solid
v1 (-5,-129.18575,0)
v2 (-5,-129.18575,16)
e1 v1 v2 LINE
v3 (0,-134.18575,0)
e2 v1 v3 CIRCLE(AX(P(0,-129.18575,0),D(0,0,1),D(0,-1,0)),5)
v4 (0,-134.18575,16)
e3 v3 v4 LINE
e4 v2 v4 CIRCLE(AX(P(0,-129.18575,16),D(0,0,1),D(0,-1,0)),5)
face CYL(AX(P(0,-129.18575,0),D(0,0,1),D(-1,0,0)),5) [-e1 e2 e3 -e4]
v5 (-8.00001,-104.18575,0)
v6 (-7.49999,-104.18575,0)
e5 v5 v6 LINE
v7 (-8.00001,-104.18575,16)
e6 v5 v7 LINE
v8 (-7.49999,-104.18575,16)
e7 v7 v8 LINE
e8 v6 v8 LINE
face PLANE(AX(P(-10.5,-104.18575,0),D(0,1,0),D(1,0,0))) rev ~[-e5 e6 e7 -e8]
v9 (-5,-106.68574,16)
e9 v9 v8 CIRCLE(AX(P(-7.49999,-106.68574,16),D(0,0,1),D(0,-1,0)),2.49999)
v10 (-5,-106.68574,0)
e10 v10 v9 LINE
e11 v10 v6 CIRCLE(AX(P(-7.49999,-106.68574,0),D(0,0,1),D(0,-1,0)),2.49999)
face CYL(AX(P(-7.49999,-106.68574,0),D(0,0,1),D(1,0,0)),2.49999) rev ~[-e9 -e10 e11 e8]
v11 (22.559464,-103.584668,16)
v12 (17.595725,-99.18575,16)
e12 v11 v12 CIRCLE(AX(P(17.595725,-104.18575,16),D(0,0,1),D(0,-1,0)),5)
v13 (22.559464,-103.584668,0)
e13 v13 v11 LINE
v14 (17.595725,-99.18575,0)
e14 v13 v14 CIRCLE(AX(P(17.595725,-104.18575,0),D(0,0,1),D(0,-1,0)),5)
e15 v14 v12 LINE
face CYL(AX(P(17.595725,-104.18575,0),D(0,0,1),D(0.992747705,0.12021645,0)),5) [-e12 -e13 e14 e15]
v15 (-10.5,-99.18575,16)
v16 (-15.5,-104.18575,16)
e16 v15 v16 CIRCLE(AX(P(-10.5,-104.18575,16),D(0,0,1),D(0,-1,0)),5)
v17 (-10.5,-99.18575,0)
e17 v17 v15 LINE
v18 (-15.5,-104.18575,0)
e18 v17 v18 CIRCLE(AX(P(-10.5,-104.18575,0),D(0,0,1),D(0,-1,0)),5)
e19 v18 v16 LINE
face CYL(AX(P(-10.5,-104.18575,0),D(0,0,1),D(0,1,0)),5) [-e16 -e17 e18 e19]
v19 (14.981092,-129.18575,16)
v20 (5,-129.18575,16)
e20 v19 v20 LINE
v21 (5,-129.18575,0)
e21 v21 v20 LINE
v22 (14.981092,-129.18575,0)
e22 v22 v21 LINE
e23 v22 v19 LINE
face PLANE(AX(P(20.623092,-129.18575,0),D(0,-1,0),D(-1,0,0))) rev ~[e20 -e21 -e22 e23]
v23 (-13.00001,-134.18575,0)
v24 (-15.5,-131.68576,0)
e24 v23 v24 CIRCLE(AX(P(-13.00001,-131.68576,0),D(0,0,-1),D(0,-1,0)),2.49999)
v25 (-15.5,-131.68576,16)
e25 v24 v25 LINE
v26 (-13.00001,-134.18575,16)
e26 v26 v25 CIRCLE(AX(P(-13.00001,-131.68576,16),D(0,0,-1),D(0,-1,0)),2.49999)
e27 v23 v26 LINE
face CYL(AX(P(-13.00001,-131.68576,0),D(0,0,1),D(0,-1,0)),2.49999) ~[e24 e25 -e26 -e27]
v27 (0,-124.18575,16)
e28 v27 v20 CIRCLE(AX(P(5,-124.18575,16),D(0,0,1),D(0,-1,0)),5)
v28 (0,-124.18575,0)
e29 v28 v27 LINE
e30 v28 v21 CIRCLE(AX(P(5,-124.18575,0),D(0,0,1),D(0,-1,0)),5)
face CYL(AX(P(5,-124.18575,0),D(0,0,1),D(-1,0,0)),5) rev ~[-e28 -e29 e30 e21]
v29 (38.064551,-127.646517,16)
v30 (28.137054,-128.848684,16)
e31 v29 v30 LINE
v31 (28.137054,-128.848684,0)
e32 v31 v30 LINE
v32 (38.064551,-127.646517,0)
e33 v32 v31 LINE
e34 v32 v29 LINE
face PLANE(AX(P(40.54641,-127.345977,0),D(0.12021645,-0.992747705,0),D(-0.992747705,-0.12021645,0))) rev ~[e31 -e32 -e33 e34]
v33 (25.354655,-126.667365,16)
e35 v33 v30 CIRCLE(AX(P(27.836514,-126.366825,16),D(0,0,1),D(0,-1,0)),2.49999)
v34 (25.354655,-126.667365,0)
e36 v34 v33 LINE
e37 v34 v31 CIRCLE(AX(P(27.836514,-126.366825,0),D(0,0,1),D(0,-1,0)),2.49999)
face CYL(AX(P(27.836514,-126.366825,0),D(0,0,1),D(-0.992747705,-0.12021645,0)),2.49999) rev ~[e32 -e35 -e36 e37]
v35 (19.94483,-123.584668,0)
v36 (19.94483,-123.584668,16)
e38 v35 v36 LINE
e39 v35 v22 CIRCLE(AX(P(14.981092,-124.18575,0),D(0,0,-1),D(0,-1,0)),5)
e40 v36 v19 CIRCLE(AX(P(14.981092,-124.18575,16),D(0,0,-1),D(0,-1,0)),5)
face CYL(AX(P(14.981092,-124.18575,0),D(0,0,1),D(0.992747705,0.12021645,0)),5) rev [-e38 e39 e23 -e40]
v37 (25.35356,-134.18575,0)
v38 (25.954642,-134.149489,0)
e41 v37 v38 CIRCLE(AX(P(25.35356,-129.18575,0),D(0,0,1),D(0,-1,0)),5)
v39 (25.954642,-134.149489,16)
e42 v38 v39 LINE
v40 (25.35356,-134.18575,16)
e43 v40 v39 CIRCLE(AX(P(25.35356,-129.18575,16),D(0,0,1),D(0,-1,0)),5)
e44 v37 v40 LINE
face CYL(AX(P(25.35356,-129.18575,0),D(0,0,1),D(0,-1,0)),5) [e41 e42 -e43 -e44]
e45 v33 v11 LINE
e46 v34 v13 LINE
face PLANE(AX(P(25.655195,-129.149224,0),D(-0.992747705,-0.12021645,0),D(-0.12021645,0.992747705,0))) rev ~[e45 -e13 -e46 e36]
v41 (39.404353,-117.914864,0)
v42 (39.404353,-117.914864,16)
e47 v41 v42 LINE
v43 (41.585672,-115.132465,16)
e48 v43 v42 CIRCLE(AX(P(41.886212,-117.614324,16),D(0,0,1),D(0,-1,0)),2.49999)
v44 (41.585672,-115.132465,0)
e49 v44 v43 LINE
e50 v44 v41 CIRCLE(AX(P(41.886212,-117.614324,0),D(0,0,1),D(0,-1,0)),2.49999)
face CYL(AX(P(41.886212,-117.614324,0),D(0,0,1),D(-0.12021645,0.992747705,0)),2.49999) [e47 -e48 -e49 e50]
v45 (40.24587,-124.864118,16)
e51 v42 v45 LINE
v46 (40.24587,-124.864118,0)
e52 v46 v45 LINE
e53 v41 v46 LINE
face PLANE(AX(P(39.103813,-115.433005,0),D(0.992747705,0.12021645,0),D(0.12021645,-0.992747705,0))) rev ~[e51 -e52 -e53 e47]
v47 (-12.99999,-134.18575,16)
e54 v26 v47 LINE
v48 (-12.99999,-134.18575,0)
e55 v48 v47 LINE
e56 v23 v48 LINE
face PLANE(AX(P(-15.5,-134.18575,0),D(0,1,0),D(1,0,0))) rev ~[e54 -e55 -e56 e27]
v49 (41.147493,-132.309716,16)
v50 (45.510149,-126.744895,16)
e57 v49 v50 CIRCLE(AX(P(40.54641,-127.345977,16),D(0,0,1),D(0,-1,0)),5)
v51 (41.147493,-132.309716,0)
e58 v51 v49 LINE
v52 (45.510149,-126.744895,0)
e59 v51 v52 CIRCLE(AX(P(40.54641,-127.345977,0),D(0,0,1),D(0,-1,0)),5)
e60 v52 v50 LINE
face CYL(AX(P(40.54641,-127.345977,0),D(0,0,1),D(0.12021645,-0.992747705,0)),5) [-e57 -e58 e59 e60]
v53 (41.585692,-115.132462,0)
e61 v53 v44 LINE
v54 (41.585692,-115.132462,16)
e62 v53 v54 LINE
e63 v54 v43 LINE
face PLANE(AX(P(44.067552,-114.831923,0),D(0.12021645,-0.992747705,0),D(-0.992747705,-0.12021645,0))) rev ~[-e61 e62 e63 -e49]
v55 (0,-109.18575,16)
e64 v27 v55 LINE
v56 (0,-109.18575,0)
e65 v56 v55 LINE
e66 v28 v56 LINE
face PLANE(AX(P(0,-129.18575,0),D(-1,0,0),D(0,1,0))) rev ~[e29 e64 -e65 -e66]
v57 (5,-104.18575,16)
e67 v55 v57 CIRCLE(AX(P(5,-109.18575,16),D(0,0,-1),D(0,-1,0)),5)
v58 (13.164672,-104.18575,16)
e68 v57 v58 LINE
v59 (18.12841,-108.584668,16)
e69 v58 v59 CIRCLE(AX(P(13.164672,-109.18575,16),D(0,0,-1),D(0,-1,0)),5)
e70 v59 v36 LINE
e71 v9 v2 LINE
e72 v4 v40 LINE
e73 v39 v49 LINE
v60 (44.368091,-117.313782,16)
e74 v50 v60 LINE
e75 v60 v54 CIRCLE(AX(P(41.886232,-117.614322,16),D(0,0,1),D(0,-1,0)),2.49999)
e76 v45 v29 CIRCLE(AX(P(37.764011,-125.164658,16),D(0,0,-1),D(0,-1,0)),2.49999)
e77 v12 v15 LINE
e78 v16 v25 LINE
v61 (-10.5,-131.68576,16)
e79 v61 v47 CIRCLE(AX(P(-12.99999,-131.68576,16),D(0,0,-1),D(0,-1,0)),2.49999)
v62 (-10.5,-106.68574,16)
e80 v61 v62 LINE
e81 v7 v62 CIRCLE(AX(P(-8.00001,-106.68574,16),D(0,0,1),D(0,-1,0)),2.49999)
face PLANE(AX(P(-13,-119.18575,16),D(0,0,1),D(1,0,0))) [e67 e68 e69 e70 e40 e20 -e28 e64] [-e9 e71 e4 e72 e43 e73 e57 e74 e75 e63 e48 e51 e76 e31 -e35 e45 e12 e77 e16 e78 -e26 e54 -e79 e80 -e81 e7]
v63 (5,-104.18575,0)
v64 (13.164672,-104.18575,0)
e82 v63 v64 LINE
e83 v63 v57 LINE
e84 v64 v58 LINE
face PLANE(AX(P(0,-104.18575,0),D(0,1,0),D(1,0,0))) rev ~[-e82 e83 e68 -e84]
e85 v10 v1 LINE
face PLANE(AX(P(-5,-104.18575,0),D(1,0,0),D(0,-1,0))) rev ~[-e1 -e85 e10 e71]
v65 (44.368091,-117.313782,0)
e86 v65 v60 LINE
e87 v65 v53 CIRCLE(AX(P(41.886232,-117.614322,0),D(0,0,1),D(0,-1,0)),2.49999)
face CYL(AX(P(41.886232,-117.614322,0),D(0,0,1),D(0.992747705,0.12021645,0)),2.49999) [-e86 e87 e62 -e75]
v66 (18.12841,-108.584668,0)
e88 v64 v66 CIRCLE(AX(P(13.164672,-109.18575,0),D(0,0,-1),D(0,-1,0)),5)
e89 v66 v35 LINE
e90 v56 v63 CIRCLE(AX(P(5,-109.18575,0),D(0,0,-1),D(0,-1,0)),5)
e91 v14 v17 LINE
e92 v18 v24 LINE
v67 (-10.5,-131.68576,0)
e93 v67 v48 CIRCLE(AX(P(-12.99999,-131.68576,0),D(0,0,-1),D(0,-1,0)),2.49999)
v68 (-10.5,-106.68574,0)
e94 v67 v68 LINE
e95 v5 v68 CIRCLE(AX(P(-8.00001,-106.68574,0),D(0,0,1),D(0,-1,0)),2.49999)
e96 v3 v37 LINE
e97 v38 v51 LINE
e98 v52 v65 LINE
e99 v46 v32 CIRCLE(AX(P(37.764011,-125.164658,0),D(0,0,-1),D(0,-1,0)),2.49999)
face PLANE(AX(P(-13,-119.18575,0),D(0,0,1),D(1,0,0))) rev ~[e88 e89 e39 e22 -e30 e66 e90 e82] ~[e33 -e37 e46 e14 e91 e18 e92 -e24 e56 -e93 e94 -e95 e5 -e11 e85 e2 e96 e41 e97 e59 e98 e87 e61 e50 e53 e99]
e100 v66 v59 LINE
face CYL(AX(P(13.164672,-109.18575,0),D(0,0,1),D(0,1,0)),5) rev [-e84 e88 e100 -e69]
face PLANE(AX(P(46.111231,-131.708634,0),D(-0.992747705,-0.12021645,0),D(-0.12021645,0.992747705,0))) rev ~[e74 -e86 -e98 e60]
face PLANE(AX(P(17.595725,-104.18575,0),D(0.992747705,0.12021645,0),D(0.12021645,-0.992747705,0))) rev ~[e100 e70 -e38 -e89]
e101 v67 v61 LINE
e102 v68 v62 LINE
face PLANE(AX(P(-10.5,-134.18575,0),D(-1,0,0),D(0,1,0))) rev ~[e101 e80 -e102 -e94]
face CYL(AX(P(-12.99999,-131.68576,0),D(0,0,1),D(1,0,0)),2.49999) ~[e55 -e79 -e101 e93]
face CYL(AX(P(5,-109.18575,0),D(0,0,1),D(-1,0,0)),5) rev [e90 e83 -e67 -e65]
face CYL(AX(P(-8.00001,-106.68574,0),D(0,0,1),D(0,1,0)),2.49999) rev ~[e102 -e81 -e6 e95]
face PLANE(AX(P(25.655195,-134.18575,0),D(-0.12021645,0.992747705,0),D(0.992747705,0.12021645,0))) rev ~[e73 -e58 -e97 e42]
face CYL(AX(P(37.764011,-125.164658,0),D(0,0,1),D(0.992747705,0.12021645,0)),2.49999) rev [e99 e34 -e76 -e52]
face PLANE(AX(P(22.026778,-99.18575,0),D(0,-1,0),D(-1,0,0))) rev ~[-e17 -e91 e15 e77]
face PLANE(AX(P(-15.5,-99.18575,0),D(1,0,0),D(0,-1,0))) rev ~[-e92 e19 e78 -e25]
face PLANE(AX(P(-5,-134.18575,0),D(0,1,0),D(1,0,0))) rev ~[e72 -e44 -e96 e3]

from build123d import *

# Parameters (mm, degrees)
F0_W     = 5
F0_H     = 30
F1_DEPTH = 16
F2_R     = 5
F3_R     = 2.49999


# Not quite as in the source:
# - a fillet or chamfer is up to 0.001 mm smaller than in the source, because OpenCascade refuses the exact size
# - a feature names something its author has since deleted; it is built from what else it names


with BuildPart() as f1:
    # F0 (on Top) → F1 (new body)
    with BuildSketch(Plane.XY):
        with Locations((-13, -119.1857503612)):
            Rectangle(F0_W, F0_H)
        Polygon((-15.5, -99.1857503612), (-15.5, -104.1857503612), (-10.5, -104.1857503612), (-5, -104.1857503612), (0, -104.1857503612), (0, -99.1857503612), align=None)
        Polygon((0, -104.1857503612), (-5, -104.1857503612), (-5, -134.1857503612), (0, -134.1857503612), (0, -129.1857503612), align=None)
        Polygon((22.0267780379, -99.1857503612), (0, -99.1857503612), (0, -104.1857503612), (17.5957249839, -104.1857503612), (20.6230915981, -129.1857503612), (0, -129.1857503612), (0, -134.1857503612), (25.6551948256, -134.1857503612), (46.11123117, -131.7086335017), (44.067551515, -114.8319225227), (39.1038129917, -115.4330047742), (40.5464103953, -127.3459772299), (25.6551948256, -129.1492239844), align=None)
    extrude(amount=F1_DEPTH)

    # F2
    f2_edges = [f1.edges().sort_by_distance(p)[0] for p in [
        (-15.5, -99.18575, 8),
        (0, -104.18575, 8),
        (17.595725, -104.18575, 8),
        (20.623092, -129.18575, 8),
        (0, -129.18575, 8),
        (-5, -134.18575, 8),
        (22.026778, -99.18575, 8),
        (25.655195, -134.18575, 8),
        (46.111231, -131.708634, 8),
    ]]
    fillet(f2_edges, radius=F2_R)

    # F3 (radius 2.5 in the source; OpenCascade refuses exactly that, so slightly less here)
    f3_edges = [f1.edges().sort_by_distance(p)[0] for p in [
        (44.067552, -114.831923, 8),
        (39.103813, -115.433005, 8),
        (-15.5, -134.18575, 8),
        (-10.5, -134.18575, 8),
        (-10.5, -104.18575, 8),
        (-5, -104.18575, 8),
        (25.655195, -129.149224, 8),
        (40.54641, -127.345977, 8),
    ]]
    fillet(f3_edges, radius=F3_R)


solid = f1.part
